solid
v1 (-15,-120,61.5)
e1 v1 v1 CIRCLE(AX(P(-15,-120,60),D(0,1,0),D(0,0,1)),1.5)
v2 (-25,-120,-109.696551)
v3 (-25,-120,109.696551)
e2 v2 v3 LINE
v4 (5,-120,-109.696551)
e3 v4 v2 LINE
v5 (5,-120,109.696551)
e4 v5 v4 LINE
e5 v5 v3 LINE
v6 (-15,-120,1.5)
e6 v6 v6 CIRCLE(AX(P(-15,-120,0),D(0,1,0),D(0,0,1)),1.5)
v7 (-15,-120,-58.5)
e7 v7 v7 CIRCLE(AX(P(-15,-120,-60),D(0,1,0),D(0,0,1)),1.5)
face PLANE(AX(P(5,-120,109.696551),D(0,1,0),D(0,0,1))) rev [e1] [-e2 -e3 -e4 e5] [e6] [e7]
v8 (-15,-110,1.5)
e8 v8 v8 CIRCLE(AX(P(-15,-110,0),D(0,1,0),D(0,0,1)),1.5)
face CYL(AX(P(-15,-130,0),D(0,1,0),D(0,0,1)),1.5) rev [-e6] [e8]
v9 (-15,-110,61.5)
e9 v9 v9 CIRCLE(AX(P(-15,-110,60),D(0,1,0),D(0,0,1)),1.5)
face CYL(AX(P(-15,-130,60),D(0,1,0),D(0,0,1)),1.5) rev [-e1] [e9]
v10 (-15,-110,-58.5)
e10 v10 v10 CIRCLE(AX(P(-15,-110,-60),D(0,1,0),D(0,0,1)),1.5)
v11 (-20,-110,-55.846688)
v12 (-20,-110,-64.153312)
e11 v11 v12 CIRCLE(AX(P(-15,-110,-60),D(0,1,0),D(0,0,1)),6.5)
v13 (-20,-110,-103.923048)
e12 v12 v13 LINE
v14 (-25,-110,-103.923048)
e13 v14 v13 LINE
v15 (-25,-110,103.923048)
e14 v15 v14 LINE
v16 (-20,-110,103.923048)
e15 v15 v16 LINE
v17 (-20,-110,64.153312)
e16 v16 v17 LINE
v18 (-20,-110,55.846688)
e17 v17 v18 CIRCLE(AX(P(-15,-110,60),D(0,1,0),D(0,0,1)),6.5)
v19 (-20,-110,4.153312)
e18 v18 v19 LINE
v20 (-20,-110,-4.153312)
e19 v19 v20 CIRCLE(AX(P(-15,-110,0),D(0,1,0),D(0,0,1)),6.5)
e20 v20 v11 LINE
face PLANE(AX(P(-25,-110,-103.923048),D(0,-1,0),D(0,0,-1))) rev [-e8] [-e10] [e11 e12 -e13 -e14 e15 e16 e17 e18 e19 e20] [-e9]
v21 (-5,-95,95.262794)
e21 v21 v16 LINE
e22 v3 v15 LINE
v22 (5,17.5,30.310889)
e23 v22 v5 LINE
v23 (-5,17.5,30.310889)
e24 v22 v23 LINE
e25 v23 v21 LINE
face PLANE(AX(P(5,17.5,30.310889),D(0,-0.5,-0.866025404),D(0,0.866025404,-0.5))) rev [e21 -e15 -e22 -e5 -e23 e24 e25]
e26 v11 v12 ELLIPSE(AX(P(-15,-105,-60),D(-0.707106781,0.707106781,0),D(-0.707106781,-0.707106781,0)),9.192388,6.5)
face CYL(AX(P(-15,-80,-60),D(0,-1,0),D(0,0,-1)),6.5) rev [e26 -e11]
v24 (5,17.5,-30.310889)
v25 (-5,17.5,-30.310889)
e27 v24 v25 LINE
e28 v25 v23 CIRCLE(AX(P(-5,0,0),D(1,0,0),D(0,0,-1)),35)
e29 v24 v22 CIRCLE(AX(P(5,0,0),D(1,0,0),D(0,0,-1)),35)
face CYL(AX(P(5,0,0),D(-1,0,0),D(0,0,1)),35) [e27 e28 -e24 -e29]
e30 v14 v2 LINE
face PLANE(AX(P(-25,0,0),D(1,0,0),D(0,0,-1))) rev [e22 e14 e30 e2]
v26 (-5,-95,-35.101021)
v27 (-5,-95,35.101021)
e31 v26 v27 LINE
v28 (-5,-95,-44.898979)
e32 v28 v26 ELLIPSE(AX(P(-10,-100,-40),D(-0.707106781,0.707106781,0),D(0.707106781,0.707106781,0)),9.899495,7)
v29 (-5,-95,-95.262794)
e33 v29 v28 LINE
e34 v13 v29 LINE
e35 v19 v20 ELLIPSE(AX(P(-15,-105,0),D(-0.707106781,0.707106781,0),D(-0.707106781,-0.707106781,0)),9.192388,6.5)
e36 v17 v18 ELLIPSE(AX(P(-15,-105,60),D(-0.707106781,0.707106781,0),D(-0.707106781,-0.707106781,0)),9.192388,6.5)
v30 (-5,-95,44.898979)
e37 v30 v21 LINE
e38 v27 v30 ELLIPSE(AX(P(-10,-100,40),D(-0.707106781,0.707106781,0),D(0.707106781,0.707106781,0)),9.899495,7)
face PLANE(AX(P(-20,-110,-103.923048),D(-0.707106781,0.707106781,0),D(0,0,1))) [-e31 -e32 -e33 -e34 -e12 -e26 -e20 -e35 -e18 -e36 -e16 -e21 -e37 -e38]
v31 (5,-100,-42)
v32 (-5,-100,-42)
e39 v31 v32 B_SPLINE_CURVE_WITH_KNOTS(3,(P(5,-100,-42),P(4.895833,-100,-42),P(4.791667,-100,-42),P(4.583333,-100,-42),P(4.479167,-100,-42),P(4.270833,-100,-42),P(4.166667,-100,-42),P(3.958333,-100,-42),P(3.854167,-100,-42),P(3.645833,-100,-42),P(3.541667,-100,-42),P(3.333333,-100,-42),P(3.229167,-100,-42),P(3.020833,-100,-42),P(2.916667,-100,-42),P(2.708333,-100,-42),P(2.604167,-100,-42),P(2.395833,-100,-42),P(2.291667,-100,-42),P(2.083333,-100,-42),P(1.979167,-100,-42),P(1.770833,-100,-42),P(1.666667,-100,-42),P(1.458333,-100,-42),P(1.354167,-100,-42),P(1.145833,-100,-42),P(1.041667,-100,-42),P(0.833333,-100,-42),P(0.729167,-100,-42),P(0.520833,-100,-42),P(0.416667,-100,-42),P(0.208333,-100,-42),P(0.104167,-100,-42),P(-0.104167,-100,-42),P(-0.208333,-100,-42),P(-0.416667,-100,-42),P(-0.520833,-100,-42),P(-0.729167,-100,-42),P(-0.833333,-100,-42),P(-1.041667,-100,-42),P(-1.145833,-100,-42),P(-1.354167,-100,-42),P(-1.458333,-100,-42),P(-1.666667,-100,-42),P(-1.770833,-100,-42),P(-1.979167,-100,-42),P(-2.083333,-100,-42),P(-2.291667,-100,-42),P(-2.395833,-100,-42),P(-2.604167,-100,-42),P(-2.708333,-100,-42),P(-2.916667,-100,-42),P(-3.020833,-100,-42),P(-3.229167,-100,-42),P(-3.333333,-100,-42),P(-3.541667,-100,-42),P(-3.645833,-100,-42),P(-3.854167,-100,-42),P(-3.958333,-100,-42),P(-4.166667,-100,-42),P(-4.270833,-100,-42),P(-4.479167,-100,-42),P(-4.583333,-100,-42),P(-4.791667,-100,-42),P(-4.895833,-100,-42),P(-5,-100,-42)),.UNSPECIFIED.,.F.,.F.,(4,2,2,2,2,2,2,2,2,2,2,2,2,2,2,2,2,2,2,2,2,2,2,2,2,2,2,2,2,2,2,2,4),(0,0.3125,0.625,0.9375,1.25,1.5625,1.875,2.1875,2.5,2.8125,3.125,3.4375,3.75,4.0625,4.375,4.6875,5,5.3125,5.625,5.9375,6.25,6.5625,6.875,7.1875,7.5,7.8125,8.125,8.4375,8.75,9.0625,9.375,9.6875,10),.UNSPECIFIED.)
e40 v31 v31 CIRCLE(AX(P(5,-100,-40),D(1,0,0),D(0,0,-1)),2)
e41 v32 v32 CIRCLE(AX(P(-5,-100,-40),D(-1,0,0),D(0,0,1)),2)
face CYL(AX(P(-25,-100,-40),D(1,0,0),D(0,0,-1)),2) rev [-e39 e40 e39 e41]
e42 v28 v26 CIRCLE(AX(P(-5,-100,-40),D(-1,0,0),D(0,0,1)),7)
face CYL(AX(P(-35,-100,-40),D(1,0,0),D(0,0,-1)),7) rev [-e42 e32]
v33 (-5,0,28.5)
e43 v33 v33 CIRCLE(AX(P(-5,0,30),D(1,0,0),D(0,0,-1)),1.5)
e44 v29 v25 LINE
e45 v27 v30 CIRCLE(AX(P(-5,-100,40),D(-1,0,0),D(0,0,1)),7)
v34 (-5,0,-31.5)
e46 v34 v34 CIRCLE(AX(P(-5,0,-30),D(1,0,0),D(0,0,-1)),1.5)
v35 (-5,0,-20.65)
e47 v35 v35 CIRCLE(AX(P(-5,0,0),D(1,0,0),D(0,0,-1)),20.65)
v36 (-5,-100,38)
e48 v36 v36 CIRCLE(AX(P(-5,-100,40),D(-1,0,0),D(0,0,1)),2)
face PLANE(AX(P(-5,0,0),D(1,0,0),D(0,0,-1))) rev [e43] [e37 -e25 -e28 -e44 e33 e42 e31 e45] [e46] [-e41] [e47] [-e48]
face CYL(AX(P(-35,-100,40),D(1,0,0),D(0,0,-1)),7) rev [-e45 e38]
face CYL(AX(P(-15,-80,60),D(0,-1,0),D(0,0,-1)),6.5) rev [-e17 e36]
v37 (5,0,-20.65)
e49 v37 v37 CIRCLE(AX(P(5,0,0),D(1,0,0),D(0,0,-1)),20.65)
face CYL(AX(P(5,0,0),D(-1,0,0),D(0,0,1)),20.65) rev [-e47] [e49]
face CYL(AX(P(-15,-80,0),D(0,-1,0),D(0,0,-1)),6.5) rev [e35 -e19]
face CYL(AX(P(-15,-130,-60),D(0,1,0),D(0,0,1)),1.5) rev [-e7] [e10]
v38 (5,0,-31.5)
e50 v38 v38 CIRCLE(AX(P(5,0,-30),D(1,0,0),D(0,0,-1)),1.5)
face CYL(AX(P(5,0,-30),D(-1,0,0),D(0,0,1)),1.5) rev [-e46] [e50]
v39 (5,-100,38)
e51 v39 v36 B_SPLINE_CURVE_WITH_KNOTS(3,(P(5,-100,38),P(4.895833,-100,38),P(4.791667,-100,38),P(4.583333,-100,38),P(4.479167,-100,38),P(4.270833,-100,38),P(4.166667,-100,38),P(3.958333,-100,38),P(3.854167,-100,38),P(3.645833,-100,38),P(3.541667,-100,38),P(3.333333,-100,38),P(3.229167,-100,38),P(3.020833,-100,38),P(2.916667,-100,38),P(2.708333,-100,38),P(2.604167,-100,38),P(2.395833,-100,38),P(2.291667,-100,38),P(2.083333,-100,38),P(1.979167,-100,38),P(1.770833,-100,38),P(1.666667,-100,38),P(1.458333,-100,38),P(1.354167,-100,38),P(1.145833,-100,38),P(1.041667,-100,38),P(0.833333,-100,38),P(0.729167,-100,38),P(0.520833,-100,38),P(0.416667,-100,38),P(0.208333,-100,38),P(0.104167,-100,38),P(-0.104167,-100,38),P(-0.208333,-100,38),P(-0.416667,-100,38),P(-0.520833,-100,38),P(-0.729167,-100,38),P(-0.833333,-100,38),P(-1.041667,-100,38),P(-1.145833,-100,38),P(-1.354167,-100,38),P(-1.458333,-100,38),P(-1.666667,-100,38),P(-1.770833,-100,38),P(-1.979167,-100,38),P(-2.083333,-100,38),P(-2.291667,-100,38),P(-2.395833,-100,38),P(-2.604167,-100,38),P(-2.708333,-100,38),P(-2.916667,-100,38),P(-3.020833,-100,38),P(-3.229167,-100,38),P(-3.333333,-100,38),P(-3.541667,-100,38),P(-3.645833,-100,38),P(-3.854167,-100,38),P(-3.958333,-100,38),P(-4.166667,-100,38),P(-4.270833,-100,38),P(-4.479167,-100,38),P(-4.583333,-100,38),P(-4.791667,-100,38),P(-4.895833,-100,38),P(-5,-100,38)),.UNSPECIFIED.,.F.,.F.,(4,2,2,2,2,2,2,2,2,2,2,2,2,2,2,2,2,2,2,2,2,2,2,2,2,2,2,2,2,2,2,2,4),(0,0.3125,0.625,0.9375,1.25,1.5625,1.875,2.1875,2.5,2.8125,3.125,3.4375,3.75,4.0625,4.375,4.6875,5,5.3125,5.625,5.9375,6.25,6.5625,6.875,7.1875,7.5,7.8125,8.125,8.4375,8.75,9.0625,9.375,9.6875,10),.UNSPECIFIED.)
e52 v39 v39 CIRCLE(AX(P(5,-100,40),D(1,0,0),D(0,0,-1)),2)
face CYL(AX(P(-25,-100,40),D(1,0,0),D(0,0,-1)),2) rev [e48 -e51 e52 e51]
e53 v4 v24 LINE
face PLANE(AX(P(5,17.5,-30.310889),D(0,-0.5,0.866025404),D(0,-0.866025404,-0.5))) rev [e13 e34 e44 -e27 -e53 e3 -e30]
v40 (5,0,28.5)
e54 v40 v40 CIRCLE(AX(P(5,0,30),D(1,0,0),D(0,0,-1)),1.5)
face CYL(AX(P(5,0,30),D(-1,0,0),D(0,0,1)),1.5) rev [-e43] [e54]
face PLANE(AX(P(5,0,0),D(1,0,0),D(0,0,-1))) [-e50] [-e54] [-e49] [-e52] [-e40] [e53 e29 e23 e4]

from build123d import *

# Parameters (mm, degrees)
CROQUIS1_R              = 20.65
CROQUIS1_R_2            = 1.5
SALIENTE_EXTRUIR1_DEPTH = 5
SALIENTE_EXTRUIR2_DEPTH = 20
CROQUIS3_R              = 1.5
CORTAR_EXTRUIR1_DEPTH   = 20
CROQUIS4_R              = 2
CORTAR_EXTRUIR2_DEPTH   = 166.327956902
CHAFL_N1_SIZE           = 15
CROQUIS5_R              = 7
CROQUIS5_R_2            = 2
CORTAR_EXTRUIR3_DEPTH   = 30
CORTAR_EXTRUIR4_START   = 30
CROQUIS6_R              = 6.5
CROQUIS6_R_2            = 1.5
CORTAR_EXTRUIR4_DEPTH   = 30


with BuildPart() as part:
    # Croquis1 → Saliente-Extruir1 (new, symmetric)
    with BuildSketch(Plane(origin=(0, 0, 0), x_dir=(0, 0, -1), z_dir=(1, 0, 0))):
        with BuildLine():
            Line((-109.696551146, -120), (109.696551146, -120))
            Line((109.696551146, -120), (30.310889132, 17.5))
            ThreePointArc((30.310889132, 17.5), (0, 35), (-30.310889132, 17.5))
            Line((-30.310889132, 17.5), (-109.696551146, -120))
        make_face()
        Circle(CROQUIS1_R, mode=Mode.SUBTRACT)
        with Locations((-30, 0)):
            Circle(CROQUIS1_R_2, mode=Mode.SUBTRACT)
        with Locations((30, 0)):
            Circle(CROQUIS1_R_2, mode=Mode.SUBTRACT)
    extrude(amount=SALIENTE_EXTRUIR1_DEPTH, both=True)

    # Croquis2 → Saliente-Extruir2 (add)
    with BuildSketch(Plane.ZY.offset(5)):
        Polygon((-109.696551146, -120), (-103.923048454, -110), (103.923048454, -110), (109.696551146, -120), align=None)
    extrude(amount=SALIENTE_EXTRUIR2_DEPTH)

    # Croquis3 → Cortar-Extruir1 (cut)
    with BuildSketch(Plane(origin=(0, -110, 0), x_dir=(1, 0, 0), z_dir=(0, 1, 0))):
        with Locations(Location((-15, 60, 0), (0, 0, 270))):
            Circle(CROQUIS3_R)
        with Locations(Location((-15, -60, 0), (0, 0, 270))):
            Circle(CROQUIS3_R)
        with Locations(Location((-15, 0, 0), (0, 0, 270))):
            Circle(CROQUIS3_R)
    extrude(amount=-CORTAR_EXTRUIR1_DEPTH, mode=Mode.SUBTRACT)

    # Croquis4 → Cortar-Extruir2 (cut, through all)
    with BuildSketch(Plane(origin=(5, 0, 0), x_dir=(0, 0, -1), z_dir=(1, 0, 0))):
        with Locations((-40, -100)):
            Circle(CROQUIS4_R)
        with Locations((40, -100)):
            Circle(CROQUIS4_R)
    extrude(amount=-CORTAR_EXTRUIR2_DEPTH, mode=Mode.SUBTRACT)

    # Chaflán1
    # the kernel refuses this chamfer: 15 mm, written as the material it adds along each edge
    with BuildSketch(Plane(origin=(-5, -110, -142.498293274), x_dir=(0.02749587661058636, 0.9996219169112966, 0), z_dir=(0, 0, 1))) as chafl_n1_piece_1_section:
        Polygon((CHAFL_N1_SIZE * 0.999621916911, CHAFL_N1_SIZE * 0.0274958766106), (-CHAFL_N1_SIZE * 0.0274958766106, CHAFL_N1_SIZE * 0.999621916911), (0, 0), align=None)
    chafl_n1_piece_1 = extrude(amount=284.996586547, mode=Mode.PRIVATE)
    chafl_n1_piece_1 = split(chafl_n1_piece_1, bisect_by=Plane(origin=(-9.982063802, -61.362690363, 75.842284643), z_dir=(0, -0.500000000000004, -0.8660254037844364)), keep=Keep.TOP, mode=Mode.PRIVATE)
    chafl_n1_piece_1 = split(chafl_n1_piece_1, bisect_by=Plane(origin=(-9.982063802, -61.362690271, -75.84228459), z_dir=(0, -0.4999999999999981, 0.8660254037844397)), keep=Keep.TOP, mode=Mode.PRIVATE)
    chafl_n1_piece_1 = chafl_n1_piece_1 - Plane(origin=(-9.982063802, -100, 40), x_dir=(0, 0, -1), z_dir=(1, 0, 0)) * Cylinder(2, 630, mode=Mode.PRIVATE)
    chafl_n1_piece_1 = chafl_n1_piece_1 - Plane(origin=(-9.982063802, -100, -40), x_dir=(0, 0, -1), z_dir=(1, 0, 0)) * Cylinder(2, 630, mode=Mode.PRIVATE)
    chafl_n1_piece_1 = chafl_n1_piece_1 - Plane(origin=(-15, -105.150253756, -60), x_dir=(0, 0, 1), z_dir=(0, 1, 0)) * Cylinder(1.5, 630, mode=Mode.PRIVATE)
    chafl_n1_piece_1 = chafl_n1_piece_1 - Plane(origin=(-15, -105.150253756, 0), x_dir=(0, 0, 1), z_dir=(0, 1, 0)) * Cylinder(1.5, 630, mode=Mode.PRIVATE)
    chafl_n1_piece_1 = chafl_n1_piece_1 - Plane(origin=(-15, -105.150253756, 60), x_dir=(0, 0, 1), z_dir=(0, 1, 0)) * Cylinder(1.5, 630, mode=Mode.PRIVATE)
    add(chafl_n1_piece_1)

    # Croquis5 → Cortar-Extruir3 (cut)
    # profile 1 of 2: a face of its own
    with BuildSketch(Plane.ZY.offset(5)):
        with Locations((-40, -100)):
            Circle(CROQUIS5_R)
        with Locations(Location((-40, -100, 0), (0, 0, 180))):
            Circle(CROQUIS5_R_2, mode=Mode.SUBTRACT)
    # profile 2 of 2: a face of its own
    with BuildSketch(Plane.ZY.offset(5)):
        with Locations((40, -100)):
            Circle(CROQUIS5_R)
        with Locations(Location((40, -100, 0), (0, 0, 180))):
            Circle(CROQUIS5_R_2, mode=Mode.SUBTRACT)
    extrude(amount=CORTAR_EXTRUIR3_DEPTH, mode=Mode.SUBTRACT)

    # Croquis6 → Cortar-Extruir4 (cut)
    # profile 1 of 3: a face of its own
    with BuildSketch(Plane(origin=(0, -110, 0), x_dir=(1, 0, 0), z_dir=(0, 1, 0)).offset(CORTAR_EXTRUIR4_START)):
        with Locations((-15, 60)):
            Circle(CROQUIS6_R)
        with Locations(Location((-15, 60, 0), (0, 0, 270))):
            Circle(CROQUIS6_R_2, mode=Mode.SUBTRACT)
    # profile 2 of 3: a face of its own
    with BuildSketch(Plane(origin=(0, -110, 0), x_dir=(1, 0, 0), z_dir=(0, 1, 0)).offset(CORTAR_EXTRUIR4_START)):
        with Locations((-15, 0)):
            Circle(CROQUIS6_R)
        with Locations(Location((-15, 0, 0), (0, 0, 270))):
            Circle(CROQUIS6_R_2, mode=Mode.SUBTRACT)
    # profile 3 of 3: a face of its own
    with BuildSketch(Plane(origin=(0, -110, 0), x_dir=(1, 0, 0), z_dir=(0, 1, 0)).offset(CORTAR_EXTRUIR4_START)):
        with Locations((-15, -60)):
            Circle(CROQUIS6_R)
        with Locations(Location((-15, -60, 0), (0, 0, 270))):
            Circle(CROQUIS6_R_2, mode=Mode.SUBTRACT)
    extrude(amount=-CORTAR_EXTRUIR4_DEPTH, mode=Mode.SUBTRACT)


solid = part.part
